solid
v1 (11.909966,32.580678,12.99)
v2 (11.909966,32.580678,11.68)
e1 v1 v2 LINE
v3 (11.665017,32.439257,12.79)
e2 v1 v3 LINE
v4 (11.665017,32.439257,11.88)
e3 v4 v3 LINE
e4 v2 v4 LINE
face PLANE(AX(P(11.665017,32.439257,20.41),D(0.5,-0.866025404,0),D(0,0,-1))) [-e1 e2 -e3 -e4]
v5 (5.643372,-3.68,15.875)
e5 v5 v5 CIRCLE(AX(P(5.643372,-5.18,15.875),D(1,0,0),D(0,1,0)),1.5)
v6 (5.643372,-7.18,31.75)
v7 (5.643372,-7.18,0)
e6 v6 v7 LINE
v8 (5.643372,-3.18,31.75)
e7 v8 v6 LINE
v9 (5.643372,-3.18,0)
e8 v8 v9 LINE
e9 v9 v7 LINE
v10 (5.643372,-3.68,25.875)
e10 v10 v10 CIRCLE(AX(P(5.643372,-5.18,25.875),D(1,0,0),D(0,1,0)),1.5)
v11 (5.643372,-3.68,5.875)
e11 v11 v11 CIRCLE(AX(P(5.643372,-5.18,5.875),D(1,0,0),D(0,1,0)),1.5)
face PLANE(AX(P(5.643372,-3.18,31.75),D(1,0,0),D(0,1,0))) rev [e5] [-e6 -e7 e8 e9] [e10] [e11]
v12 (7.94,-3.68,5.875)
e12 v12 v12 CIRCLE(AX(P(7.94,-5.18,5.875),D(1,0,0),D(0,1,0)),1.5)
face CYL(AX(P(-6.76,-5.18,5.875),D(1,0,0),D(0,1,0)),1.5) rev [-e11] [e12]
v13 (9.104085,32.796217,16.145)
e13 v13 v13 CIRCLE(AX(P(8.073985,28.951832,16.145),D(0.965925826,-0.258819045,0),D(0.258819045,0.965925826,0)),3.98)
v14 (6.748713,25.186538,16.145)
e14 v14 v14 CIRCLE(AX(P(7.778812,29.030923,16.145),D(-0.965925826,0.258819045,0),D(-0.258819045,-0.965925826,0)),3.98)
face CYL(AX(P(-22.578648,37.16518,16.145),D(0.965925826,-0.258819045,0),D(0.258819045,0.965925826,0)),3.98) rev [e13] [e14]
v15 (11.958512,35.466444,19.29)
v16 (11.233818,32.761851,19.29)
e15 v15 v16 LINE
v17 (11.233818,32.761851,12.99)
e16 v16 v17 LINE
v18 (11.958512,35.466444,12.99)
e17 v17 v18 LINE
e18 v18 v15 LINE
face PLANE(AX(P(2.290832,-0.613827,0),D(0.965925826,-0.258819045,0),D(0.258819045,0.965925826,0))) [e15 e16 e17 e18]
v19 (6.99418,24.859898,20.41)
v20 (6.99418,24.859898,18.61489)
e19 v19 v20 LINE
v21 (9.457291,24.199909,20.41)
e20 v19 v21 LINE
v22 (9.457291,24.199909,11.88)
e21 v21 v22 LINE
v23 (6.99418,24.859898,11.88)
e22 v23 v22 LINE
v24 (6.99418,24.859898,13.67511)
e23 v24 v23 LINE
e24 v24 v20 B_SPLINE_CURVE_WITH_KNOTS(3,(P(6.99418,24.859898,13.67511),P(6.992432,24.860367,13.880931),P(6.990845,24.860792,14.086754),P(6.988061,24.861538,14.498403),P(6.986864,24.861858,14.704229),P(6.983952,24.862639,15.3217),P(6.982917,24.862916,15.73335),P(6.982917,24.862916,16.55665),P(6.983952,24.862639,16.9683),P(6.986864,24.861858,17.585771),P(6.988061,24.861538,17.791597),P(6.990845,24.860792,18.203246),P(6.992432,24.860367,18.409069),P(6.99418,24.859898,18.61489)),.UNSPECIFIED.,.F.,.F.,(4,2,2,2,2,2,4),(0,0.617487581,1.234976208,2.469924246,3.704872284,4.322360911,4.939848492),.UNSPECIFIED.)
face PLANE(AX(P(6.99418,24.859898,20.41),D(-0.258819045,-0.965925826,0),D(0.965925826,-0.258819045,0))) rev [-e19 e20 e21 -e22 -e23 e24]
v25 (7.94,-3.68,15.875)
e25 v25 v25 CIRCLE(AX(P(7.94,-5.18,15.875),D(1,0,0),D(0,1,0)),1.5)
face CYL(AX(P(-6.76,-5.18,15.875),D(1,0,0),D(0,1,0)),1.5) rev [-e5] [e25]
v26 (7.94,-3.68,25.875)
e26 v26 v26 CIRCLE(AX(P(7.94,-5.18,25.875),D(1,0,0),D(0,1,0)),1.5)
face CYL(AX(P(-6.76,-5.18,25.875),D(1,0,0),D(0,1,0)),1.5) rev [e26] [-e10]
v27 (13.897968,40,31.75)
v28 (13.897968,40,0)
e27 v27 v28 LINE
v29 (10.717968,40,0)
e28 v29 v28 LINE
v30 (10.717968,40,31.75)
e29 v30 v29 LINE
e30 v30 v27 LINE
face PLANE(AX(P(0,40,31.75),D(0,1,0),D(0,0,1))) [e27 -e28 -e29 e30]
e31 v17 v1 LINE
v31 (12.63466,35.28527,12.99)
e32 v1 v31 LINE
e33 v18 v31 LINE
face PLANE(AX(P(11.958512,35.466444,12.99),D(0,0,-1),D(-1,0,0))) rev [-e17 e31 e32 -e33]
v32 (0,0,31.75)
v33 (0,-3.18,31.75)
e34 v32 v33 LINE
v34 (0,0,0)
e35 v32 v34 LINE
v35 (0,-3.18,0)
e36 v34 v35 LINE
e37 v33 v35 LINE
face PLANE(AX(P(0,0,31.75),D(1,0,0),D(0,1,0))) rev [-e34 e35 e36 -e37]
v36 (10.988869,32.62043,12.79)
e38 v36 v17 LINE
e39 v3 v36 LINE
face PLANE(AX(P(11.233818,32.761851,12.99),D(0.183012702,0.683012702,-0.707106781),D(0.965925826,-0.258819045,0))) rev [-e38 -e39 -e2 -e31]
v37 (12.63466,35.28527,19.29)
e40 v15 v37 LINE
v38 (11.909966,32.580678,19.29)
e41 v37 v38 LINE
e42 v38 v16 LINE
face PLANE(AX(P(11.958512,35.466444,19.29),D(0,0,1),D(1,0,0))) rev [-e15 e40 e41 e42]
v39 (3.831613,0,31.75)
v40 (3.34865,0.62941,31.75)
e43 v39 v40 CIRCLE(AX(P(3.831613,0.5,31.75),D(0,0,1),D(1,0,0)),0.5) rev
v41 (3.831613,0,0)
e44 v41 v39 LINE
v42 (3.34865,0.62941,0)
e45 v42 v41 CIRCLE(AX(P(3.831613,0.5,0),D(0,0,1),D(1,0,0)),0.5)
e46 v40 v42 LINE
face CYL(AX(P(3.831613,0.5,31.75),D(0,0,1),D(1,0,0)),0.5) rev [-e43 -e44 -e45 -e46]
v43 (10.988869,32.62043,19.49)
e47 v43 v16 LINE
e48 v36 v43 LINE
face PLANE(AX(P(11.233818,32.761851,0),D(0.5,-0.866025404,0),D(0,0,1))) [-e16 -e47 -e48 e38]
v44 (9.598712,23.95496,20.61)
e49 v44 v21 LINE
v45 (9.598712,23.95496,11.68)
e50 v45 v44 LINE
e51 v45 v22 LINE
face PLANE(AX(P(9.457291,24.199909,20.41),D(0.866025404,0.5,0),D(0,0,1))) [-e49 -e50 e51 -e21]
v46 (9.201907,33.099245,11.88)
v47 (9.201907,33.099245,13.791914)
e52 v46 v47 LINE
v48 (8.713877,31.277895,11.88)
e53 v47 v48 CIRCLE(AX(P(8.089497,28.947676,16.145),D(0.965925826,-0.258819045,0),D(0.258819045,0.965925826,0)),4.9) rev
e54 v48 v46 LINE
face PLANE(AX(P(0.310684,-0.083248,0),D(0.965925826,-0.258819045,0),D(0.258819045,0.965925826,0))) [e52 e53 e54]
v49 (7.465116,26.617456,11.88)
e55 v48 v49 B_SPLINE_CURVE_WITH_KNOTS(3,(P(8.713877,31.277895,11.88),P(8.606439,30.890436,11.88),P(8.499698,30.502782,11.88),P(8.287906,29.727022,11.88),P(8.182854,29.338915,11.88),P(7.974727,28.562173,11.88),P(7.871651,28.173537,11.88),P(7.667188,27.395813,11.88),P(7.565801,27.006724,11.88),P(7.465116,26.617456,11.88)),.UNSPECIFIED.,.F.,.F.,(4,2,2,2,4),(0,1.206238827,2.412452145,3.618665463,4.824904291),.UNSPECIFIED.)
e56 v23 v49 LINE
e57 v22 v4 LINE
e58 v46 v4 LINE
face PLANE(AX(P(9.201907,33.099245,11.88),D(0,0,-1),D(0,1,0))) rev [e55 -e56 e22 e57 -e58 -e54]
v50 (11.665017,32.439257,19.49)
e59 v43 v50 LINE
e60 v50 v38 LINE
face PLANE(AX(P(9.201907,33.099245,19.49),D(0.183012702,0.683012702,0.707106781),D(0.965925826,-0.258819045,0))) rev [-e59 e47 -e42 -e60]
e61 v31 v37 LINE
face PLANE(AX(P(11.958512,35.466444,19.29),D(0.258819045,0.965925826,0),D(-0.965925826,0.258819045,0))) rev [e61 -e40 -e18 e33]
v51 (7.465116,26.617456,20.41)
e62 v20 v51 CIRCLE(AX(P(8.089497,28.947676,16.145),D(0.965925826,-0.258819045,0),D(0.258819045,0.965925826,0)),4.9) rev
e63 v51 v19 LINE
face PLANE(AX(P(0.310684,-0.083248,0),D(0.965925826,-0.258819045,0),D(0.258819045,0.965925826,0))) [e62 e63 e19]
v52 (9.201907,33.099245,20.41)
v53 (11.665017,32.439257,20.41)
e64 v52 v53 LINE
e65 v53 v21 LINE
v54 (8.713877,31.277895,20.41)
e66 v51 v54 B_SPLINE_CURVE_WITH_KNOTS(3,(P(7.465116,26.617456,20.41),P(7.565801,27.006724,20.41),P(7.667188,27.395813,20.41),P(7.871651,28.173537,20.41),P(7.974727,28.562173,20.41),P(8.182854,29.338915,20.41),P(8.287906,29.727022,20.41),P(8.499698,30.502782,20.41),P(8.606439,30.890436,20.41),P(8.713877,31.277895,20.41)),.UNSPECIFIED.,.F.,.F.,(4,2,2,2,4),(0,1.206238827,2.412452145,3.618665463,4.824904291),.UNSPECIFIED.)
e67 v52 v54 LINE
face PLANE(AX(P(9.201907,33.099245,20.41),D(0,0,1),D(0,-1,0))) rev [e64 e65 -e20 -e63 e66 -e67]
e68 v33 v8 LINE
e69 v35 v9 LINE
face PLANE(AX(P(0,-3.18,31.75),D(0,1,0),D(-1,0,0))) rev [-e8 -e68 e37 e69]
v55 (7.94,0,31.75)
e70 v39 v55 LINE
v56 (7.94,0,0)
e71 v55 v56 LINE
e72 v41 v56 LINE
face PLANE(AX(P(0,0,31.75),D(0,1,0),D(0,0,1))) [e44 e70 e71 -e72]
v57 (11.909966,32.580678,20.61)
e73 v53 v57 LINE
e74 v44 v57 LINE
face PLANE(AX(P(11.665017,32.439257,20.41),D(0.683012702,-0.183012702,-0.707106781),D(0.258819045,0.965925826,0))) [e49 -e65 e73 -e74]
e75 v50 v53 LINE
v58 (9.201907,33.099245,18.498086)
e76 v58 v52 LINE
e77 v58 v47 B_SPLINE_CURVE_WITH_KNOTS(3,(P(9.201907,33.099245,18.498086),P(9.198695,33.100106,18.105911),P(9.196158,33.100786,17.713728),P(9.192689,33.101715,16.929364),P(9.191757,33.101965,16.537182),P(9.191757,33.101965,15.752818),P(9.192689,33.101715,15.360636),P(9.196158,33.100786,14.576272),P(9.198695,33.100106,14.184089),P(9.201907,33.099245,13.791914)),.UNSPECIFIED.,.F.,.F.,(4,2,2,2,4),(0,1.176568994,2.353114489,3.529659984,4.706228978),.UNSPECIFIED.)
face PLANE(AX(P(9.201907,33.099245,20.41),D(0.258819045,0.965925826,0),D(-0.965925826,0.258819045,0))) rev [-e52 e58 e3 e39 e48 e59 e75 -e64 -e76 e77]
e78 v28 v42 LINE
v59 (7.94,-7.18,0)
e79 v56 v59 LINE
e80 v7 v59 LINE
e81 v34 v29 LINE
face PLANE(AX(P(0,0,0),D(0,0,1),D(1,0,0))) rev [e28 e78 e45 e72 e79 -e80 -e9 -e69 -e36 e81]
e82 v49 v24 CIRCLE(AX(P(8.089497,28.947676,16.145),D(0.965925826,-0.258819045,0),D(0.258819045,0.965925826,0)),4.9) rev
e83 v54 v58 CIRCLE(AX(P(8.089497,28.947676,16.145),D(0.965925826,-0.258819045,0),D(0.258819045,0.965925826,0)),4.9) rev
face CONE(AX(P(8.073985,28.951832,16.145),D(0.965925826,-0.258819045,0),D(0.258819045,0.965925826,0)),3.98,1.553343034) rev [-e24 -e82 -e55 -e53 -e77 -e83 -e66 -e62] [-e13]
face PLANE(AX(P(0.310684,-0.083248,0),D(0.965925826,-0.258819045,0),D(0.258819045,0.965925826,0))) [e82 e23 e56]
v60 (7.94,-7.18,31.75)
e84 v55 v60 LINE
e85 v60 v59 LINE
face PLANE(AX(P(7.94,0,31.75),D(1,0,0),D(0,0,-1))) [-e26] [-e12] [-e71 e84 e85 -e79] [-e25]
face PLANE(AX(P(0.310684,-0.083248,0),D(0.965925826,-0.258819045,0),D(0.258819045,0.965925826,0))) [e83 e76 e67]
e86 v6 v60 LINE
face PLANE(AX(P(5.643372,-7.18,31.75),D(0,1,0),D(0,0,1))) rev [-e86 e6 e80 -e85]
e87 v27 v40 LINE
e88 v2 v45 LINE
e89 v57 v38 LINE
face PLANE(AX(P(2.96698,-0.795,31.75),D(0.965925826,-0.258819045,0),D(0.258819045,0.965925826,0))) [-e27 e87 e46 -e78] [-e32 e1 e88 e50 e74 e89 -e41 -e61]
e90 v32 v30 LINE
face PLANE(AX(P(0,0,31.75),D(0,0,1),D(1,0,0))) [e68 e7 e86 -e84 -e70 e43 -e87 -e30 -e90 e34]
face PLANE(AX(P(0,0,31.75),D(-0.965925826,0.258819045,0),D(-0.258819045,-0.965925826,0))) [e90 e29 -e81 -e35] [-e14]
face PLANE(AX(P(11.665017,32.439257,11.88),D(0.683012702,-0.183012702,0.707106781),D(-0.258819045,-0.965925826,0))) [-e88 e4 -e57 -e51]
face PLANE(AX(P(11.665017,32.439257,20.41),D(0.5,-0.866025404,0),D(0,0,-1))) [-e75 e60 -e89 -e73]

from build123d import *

# Parameters (mm, degrees)
ESQUISSE1_W             = 2.296627968
ESQUISSE1_H             = 4
BOSS_EXTRU_1_DEPTH      = 31.75
ESQUISSE2_W             = 8.53
ESQUISSE2_H             = 8.53
ENL_V_MAT_EXTRU_1_DEPTH = 2.75
ESQUISSE3_R             = 3.98
ENL_V_MAT_EXTRU_2_DEPTH = 31.75
CHANFREIN3_SIZE         = 0.01605866
CHANFREIN3_SIZE_2       = 0.92
ESQUISSE5_W             = 6.3
ESQUISSE5_H             = 3
ENL_V_MAT_EXTRU_3_DEPTH = 0.7
CHANFREIN4_SIZE         = 0.2
ESQUISSE6_R             = 1.5
ENL_V_MAT_EXTRU_4_DEPTH = 14.7
CONG_3_R                = 0.5


with BuildPart() as part:
    # Esquisse1 → Boss.-Extru.1 (new body)
    with BuildSketch(Plane.XY):
        Polygon((3.18, 0), (0, 0), (10.717967697, 40), (13.897967697, 40), align=None)
        Polygon((3.18, 0), (0, 0), (0, -3.18), (5.643372032, -3.18), (7.94, -3.18), (7.94, 0), align=None)
        with Locations((6.791686016, -5.18)):
            Rectangle(ESQUISSE1_W, ESQUISSE1_H)
    extrude(amount=BOSS_EXTRU_1_DEPTH)

    # Esquisse2 → Enlèv. mat.-Extru.1 (cut)
    with BuildSketch(Plane(origin=(2.966980392, -0.795, 0), x_dir=(0, 0, -1), z_dir=(0.9659258262890674, -0.2588190451025244, 0))):
        with Locations((-16.145, 30.088044563)):
            Rectangle(ESQUISSE2_W, ESQUISSE2_H)
    extrude(amount=-ENL_V_MAT_EXTRU_1_DEPTH, mode=Mode.SUBTRACT)

    # Esquisse3 → Enlèv. mat.-Extru.2 (cut)
    with BuildSketch(Plane(origin=(0.31068437, -0.083247626, 0), x_dir=(0, 0, -1), z_dir=(0.9659258262890674, -0.2588190451025245, 0))):
        with Locations(Location((-16.145, 30.055023218, 0), (0, 0, 90))):
            Circle(ESQUISSE3_R)
    extrude(amount=-ENL_V_MAT_EXTRU_2_DEPTH, mode=Mode.SUBTRACT)

    # Chanfrein3
    # the kernel refuses this chamfer: 0.92, 0.01605866 mm, written as the material it takes off along each edge
    with BuildSketch(Plane(origin=(8.08949678, 28.94767551, 16.145), x_dir=(0.2588190451025241, 0.9659258262890673, 0), z_dir=(0, 0, -1))) as chanfrein3_piece_1_section:
        Polygon((3.98, -CHANFREIN3_SIZE * 0.999999983433), (3.98 + CHANFREIN3_SIZE_2, 0), (3.98, 0), align=None)
    chanfrein3_piece_1 = revolve(axis=Axis((8.08949678, 28.94767551, 16.145), (0.9659258262890674, -0.2588190451025245, 0)), mode=Mode.PRIVATE)
    chanfrein3_piece_1 = split(chanfrein3_piece_1, bisect_by=Plane(origin=(9.196219069, 33.100769288, 19.703208658), z_dir=(-0.25881904510252435, -0.9659258262890673, 0)), keep=Keep.TOP, mode=Mode.PRIVATE)
    chanfrein3_piece_1 = split(chanfrein3_piece_1, bisect_by=Plane(origin=(8.615509723, 30.933532505, 20.41), z_dir=(0, 0, -1)), keep=Keep.TOP, mode=Mode.PRIVATE)
    chanfrein3_piece_1 = split(chanfrein3_piece_1, bisect_by=Plane(origin=(8.615509723, 30.933532505, 11.88), z_dir=(0, 0, 1)), keep=Keep.TOP, mode=Mode.PRIVATE)
    chanfrein3_piece_1 = split(chanfrein3_piece_1, bisect_by=Plane(origin=(6.988492614, 24.86142199, 19.703208658), z_dir=(0.25881904510252435, 0.9659258262890673, 0)), keep=Keep.TOP, mode=Mode.PRIVATE)
    add(chanfrein3_piece_1, mode=Mode.SUBTRACT)

    # Esquisse5 → Enlèv. mat.-Extru.3 (cut)
    with BuildSketch(Plane(origin=(2.966980392, -0.795, 0), x_dir=(0, 0, -1), z_dir=(0.9659258262890674, -0.2588190451025244, 0))):
        with Locations((-16.14, 35.853044563)):
            Rectangle(ESQUISSE5_W, ESQUISSE5_H)
    extrude(amount=-ENL_V_MAT_EXTRU_3_DEPTH, mode=Mode.SUBTRACT)

    # Chanfrein4
    chanfrein4_edges = [part.edges().sort_by_distance(p)[0] for p in [
        (10.754339355, 28.267819306, 20.41),
        (9.650476128, 24.148145657, 16.145),
        (10.754339355, 28.267819306, 11.88),
        (11.858202582, 32.387492955, 12.435),
        (11.858202582, 32.387492955, 19.85),
        (11.520128543, 32.478079621, 19.29),
        (11.182054504, 32.568666287, 16.14),
        (11.520128543, 32.478079621, 12.99),
    ]]
    chamfer(chanfrein4_edges, length=CHANFREIN4_SIZE)

    # Esquisse6 → Enlèv. mat.-Extru.4 (cut)
    with BuildSketch(Plane(origin=(7.94, 0, 0), x_dir=(0, 0, -1), z_dir=(1, 0, 0))):
        with Locations(Location((-25.875, -5.18, 0), (0, 0, 90))):
            Circle(ESQUISSE6_R)
        with Locations(Location((-15.875, -5.18, 0), (0, 0, 90))):
            Circle(ESQUISSE6_R)
        with Locations(Location((-5.875, -5.18, 0), (0, 0, 90))):
            Circle(ESQUISSE6_R)
    extrude(amount=-ENL_V_MAT_EXTRU_4_DEPTH, mode=Mode.SUBTRACT)

    # Congé3
    cong_3_edges = [part.edges().sort_by_distance(p)[0] for p in [
        (3.18, 0, 15.875),
    ]]
    fillet(cong_3_edges, radius=CONG_3_R)


solid = part.part
